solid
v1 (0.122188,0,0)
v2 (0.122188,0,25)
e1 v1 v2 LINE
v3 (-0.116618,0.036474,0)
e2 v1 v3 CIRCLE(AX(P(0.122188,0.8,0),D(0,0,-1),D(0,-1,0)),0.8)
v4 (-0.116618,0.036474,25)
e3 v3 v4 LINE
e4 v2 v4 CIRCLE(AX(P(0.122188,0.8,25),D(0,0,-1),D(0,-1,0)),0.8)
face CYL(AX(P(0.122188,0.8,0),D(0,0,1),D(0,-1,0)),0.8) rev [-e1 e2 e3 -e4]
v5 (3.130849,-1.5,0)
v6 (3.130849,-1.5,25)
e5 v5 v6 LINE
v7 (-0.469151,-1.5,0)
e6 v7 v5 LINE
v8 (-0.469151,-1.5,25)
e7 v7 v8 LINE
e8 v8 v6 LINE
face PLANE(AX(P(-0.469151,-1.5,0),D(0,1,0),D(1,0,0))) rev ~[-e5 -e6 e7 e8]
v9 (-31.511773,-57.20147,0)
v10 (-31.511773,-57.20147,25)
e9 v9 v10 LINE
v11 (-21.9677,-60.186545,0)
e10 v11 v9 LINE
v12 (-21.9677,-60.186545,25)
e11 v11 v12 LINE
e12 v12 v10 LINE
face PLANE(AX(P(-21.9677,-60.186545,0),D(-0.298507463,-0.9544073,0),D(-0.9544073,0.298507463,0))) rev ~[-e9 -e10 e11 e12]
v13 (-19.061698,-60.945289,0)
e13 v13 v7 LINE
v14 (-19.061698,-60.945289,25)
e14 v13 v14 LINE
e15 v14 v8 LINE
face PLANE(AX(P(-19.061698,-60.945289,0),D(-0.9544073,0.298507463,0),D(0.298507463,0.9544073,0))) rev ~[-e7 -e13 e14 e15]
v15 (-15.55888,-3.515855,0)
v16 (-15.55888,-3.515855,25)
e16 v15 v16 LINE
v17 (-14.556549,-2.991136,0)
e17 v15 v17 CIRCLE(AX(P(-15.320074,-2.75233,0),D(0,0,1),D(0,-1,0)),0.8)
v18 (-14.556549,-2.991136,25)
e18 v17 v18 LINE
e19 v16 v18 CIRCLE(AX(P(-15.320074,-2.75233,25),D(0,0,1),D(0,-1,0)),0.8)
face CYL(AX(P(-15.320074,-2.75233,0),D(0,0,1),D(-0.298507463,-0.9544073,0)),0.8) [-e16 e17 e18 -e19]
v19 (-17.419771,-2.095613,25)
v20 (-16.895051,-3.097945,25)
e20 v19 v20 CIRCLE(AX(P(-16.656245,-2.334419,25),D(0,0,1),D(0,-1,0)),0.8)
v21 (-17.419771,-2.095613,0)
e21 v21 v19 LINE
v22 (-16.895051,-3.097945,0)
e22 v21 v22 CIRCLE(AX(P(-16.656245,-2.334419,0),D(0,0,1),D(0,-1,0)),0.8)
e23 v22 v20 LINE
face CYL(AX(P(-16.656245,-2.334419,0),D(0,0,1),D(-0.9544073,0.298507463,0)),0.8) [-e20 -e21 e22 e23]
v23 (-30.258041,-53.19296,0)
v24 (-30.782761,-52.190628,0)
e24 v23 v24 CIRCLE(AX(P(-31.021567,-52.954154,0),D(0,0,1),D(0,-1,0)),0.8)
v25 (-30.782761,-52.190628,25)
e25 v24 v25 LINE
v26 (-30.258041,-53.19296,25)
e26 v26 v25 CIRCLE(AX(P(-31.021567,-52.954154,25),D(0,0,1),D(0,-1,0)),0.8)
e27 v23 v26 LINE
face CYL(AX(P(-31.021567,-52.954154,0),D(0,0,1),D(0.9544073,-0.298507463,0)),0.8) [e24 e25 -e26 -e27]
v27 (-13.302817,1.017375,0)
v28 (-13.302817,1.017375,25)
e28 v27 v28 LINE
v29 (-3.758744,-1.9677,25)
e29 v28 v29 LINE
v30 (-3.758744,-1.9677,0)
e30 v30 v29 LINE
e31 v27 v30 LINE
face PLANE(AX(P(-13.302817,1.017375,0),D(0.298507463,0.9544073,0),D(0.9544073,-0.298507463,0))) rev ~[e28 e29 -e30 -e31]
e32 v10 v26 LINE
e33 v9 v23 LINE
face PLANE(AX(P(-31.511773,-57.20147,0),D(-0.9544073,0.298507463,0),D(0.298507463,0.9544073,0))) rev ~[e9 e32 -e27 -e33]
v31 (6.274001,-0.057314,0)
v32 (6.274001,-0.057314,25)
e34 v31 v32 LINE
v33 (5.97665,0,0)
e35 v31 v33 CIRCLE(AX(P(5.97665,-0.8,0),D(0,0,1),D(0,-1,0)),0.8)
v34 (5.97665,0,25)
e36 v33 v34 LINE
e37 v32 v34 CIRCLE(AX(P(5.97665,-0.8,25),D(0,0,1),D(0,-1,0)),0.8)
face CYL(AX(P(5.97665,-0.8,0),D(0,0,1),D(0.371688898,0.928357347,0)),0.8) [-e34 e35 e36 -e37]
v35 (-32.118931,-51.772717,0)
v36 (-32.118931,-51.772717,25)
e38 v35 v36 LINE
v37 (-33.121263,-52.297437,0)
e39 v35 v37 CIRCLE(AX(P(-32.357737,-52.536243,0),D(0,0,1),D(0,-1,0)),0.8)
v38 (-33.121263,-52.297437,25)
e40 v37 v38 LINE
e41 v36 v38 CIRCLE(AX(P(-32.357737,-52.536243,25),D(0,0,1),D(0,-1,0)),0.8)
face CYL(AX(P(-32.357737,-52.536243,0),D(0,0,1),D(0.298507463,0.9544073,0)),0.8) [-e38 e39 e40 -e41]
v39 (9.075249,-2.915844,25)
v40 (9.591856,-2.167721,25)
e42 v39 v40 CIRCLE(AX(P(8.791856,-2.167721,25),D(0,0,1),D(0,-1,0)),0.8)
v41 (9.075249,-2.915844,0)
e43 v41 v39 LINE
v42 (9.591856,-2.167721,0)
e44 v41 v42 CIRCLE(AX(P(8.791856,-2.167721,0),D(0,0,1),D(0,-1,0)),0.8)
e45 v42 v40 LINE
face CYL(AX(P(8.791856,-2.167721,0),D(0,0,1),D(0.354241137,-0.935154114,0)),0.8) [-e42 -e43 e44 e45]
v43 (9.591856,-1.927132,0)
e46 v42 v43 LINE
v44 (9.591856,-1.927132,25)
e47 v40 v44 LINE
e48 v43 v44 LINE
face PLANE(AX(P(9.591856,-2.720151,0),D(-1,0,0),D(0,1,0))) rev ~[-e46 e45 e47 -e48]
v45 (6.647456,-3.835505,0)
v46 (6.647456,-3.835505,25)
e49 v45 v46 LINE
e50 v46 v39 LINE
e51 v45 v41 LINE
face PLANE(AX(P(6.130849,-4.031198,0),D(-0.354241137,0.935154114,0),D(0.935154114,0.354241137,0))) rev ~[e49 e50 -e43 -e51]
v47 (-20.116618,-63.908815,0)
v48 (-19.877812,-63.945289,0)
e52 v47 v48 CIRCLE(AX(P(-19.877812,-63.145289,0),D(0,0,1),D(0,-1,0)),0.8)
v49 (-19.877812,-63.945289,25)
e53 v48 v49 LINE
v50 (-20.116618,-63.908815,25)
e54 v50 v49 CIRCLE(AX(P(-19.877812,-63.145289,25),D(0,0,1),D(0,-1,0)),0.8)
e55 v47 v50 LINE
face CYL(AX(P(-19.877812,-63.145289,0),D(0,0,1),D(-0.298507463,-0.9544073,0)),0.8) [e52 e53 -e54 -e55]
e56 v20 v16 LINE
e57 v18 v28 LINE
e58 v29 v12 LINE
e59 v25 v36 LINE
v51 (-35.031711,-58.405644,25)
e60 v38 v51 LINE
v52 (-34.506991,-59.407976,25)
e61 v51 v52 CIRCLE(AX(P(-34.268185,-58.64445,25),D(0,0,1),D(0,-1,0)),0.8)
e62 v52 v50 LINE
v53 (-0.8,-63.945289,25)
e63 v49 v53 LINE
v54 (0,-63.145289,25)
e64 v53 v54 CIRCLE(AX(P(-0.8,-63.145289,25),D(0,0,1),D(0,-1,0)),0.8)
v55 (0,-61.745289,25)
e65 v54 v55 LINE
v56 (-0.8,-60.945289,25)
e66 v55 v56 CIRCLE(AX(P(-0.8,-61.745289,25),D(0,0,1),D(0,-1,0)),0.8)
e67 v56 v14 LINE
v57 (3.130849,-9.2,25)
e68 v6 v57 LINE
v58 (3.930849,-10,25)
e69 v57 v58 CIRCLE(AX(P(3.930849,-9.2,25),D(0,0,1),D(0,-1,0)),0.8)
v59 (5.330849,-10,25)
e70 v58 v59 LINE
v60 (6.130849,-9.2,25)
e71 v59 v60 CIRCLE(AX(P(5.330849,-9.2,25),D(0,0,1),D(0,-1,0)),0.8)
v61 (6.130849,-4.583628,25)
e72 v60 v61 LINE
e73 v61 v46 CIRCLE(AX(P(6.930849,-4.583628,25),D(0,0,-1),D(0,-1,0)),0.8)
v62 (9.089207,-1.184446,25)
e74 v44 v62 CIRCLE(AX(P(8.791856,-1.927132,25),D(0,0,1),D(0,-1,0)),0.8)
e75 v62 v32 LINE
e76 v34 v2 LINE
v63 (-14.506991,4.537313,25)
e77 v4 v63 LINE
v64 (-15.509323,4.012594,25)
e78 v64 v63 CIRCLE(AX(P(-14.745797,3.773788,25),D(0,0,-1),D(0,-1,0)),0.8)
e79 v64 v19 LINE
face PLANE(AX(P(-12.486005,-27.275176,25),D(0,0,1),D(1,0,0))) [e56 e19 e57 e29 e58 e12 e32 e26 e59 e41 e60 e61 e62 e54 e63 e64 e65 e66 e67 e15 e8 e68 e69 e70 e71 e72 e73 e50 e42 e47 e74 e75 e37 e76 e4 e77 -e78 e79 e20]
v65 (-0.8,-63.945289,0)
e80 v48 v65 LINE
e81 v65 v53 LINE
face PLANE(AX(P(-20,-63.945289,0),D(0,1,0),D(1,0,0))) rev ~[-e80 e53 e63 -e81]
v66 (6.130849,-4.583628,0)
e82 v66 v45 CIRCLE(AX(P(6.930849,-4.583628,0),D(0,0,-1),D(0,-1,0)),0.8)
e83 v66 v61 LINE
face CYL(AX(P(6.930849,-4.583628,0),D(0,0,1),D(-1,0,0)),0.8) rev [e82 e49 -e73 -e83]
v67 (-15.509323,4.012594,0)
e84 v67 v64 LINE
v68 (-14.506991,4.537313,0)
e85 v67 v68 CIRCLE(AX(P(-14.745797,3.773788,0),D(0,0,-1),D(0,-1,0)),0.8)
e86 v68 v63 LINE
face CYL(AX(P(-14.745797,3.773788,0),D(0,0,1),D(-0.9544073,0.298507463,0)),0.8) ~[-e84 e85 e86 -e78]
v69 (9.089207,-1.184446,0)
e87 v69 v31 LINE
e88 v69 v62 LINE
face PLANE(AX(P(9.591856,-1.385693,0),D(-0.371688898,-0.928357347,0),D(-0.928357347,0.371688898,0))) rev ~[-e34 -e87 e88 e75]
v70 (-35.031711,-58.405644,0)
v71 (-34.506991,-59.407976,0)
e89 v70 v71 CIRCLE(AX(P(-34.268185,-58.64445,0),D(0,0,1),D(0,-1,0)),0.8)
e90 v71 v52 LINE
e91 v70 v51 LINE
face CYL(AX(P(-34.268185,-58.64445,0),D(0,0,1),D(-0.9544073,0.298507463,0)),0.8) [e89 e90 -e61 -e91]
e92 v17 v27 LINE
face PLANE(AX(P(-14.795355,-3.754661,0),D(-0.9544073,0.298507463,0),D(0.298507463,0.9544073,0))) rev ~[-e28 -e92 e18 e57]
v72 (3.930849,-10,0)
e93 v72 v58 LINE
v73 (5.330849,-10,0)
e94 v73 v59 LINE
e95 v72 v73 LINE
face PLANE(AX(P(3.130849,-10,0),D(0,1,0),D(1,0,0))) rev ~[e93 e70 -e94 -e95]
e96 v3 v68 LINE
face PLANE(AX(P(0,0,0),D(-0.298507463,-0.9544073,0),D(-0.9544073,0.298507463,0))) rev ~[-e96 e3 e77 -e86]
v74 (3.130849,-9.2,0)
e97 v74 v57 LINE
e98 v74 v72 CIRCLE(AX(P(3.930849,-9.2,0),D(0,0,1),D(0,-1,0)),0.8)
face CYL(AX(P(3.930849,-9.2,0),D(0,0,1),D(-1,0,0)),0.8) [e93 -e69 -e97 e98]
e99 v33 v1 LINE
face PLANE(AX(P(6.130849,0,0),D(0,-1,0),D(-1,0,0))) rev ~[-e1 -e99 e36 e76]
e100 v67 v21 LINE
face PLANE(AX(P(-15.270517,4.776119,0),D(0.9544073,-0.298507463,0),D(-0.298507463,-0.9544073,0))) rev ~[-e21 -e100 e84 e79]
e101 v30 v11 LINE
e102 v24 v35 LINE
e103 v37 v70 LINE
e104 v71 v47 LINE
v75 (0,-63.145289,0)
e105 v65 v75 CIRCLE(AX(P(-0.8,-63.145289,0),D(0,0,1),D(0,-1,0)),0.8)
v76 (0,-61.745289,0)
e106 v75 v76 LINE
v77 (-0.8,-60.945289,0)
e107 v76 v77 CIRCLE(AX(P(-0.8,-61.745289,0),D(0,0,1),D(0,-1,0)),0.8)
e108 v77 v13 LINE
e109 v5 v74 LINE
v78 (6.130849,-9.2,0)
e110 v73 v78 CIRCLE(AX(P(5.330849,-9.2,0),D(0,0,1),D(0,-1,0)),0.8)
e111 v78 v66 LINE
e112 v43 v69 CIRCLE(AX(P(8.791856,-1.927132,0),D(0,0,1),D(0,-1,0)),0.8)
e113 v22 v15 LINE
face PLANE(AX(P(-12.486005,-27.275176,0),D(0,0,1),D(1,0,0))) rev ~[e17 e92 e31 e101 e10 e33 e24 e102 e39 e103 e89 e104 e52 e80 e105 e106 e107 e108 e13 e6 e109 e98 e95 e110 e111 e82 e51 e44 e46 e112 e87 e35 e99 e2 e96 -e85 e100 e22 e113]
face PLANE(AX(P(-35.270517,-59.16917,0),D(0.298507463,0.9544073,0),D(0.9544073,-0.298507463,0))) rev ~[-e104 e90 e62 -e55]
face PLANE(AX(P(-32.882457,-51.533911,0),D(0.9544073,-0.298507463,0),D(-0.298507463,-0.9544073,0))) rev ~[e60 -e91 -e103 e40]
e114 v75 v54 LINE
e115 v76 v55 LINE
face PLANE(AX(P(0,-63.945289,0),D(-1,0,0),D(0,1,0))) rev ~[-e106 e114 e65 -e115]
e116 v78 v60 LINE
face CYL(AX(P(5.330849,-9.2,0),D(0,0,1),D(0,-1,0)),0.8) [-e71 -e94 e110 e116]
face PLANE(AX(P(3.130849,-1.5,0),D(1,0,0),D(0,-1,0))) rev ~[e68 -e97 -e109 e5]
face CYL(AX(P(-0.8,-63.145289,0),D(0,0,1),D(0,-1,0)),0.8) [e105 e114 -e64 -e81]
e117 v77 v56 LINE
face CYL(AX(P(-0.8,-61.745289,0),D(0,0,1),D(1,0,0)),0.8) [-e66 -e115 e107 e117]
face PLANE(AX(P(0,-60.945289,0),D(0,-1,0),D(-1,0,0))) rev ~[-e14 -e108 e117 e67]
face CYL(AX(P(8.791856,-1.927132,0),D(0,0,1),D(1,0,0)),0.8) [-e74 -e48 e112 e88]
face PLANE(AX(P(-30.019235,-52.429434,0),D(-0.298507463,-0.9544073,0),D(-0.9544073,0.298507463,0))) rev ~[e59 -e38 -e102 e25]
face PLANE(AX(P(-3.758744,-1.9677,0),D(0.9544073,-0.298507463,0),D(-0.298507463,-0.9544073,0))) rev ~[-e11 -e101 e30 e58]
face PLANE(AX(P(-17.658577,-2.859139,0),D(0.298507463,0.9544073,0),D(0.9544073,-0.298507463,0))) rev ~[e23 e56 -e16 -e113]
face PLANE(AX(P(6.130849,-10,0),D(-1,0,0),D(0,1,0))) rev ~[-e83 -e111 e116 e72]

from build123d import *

# Parameters (mm, degrees)
F1_DEPTH = 25
F2_R     = 0.8


# Not quite as in the source:
# - a feature names something its author has since deleted; it is built from what else it names


with BuildPart() as f1:
    # F0 (on Top) → F1 (new body)
    with BuildSketch(Plane.XY):
        Polygon((-15.2705168036, 4.776119403), (-17.6585765051, -2.8591389988), (-14.7953546044, -3.7546613869), (-13.302817291, 1.0173751143), (-3.7587442887, -1.9676995126), (-21.9676995126, -60.1865448263), (-31.5117725148, -57.2014701994), (-30.0192352014, -52.4294336983), (-32.8824571021, -51.5339113102), (-35.2705168036, -59.169169712), (-20, -63.945289115), (-19.0616978853, -60.945289115), (-0.4691510573, -1.5), (3.1308489427, -1.5), (3.1308489427, -10), (6.1308489427, -10), (6.1308489427, -4.0311980993), (6.1308489427, 0), (0, 0), align=None)
        Polygon((0, -60.945289115), (-19.0616978853, -60.945289115), (-20, -63.945289115), (0, -63.945289115), align=None)
        Polygon((9.5918557882, -1.385692507), (6.1308489427, 0), (6.1308489427, -4.0311980993), (9.5918557882, -2.7201510966), align=None)
    extrude(amount=F1_DEPTH)

    # F2
    f2_edges = [f1.edges().sort_by_distance(p)[0] for p in [
        (-15.270517, 4.776119, 12.5),
        (-17.658577, -2.859139, 12.5),
        (-14.795355, -3.754661, 12.5),
        (-32.882457, -51.533911, 12.5),
        (-35.270517, -59.16917, 12.5),
        (-30.019235, -52.429434, 12.5),
        (-20, -63.945289, 12.5),
        (6.130849, -10, 12.5),
        (3.130849, -10, 12.5),
        (0, -60.945289, 12.5),
        (0, -63.945289, 12.5),
        (9.591856, -1.385693, 12.5),
        (9.591856, -2.720151, 12.5),
        (0, 0, 12.5),
        (6.130849, 0, 12.5),
        (6.130849, -4.031198, 12.5),
    ]]
    fillet(f2_edges, radius=F2_R)


solid = f1.part
